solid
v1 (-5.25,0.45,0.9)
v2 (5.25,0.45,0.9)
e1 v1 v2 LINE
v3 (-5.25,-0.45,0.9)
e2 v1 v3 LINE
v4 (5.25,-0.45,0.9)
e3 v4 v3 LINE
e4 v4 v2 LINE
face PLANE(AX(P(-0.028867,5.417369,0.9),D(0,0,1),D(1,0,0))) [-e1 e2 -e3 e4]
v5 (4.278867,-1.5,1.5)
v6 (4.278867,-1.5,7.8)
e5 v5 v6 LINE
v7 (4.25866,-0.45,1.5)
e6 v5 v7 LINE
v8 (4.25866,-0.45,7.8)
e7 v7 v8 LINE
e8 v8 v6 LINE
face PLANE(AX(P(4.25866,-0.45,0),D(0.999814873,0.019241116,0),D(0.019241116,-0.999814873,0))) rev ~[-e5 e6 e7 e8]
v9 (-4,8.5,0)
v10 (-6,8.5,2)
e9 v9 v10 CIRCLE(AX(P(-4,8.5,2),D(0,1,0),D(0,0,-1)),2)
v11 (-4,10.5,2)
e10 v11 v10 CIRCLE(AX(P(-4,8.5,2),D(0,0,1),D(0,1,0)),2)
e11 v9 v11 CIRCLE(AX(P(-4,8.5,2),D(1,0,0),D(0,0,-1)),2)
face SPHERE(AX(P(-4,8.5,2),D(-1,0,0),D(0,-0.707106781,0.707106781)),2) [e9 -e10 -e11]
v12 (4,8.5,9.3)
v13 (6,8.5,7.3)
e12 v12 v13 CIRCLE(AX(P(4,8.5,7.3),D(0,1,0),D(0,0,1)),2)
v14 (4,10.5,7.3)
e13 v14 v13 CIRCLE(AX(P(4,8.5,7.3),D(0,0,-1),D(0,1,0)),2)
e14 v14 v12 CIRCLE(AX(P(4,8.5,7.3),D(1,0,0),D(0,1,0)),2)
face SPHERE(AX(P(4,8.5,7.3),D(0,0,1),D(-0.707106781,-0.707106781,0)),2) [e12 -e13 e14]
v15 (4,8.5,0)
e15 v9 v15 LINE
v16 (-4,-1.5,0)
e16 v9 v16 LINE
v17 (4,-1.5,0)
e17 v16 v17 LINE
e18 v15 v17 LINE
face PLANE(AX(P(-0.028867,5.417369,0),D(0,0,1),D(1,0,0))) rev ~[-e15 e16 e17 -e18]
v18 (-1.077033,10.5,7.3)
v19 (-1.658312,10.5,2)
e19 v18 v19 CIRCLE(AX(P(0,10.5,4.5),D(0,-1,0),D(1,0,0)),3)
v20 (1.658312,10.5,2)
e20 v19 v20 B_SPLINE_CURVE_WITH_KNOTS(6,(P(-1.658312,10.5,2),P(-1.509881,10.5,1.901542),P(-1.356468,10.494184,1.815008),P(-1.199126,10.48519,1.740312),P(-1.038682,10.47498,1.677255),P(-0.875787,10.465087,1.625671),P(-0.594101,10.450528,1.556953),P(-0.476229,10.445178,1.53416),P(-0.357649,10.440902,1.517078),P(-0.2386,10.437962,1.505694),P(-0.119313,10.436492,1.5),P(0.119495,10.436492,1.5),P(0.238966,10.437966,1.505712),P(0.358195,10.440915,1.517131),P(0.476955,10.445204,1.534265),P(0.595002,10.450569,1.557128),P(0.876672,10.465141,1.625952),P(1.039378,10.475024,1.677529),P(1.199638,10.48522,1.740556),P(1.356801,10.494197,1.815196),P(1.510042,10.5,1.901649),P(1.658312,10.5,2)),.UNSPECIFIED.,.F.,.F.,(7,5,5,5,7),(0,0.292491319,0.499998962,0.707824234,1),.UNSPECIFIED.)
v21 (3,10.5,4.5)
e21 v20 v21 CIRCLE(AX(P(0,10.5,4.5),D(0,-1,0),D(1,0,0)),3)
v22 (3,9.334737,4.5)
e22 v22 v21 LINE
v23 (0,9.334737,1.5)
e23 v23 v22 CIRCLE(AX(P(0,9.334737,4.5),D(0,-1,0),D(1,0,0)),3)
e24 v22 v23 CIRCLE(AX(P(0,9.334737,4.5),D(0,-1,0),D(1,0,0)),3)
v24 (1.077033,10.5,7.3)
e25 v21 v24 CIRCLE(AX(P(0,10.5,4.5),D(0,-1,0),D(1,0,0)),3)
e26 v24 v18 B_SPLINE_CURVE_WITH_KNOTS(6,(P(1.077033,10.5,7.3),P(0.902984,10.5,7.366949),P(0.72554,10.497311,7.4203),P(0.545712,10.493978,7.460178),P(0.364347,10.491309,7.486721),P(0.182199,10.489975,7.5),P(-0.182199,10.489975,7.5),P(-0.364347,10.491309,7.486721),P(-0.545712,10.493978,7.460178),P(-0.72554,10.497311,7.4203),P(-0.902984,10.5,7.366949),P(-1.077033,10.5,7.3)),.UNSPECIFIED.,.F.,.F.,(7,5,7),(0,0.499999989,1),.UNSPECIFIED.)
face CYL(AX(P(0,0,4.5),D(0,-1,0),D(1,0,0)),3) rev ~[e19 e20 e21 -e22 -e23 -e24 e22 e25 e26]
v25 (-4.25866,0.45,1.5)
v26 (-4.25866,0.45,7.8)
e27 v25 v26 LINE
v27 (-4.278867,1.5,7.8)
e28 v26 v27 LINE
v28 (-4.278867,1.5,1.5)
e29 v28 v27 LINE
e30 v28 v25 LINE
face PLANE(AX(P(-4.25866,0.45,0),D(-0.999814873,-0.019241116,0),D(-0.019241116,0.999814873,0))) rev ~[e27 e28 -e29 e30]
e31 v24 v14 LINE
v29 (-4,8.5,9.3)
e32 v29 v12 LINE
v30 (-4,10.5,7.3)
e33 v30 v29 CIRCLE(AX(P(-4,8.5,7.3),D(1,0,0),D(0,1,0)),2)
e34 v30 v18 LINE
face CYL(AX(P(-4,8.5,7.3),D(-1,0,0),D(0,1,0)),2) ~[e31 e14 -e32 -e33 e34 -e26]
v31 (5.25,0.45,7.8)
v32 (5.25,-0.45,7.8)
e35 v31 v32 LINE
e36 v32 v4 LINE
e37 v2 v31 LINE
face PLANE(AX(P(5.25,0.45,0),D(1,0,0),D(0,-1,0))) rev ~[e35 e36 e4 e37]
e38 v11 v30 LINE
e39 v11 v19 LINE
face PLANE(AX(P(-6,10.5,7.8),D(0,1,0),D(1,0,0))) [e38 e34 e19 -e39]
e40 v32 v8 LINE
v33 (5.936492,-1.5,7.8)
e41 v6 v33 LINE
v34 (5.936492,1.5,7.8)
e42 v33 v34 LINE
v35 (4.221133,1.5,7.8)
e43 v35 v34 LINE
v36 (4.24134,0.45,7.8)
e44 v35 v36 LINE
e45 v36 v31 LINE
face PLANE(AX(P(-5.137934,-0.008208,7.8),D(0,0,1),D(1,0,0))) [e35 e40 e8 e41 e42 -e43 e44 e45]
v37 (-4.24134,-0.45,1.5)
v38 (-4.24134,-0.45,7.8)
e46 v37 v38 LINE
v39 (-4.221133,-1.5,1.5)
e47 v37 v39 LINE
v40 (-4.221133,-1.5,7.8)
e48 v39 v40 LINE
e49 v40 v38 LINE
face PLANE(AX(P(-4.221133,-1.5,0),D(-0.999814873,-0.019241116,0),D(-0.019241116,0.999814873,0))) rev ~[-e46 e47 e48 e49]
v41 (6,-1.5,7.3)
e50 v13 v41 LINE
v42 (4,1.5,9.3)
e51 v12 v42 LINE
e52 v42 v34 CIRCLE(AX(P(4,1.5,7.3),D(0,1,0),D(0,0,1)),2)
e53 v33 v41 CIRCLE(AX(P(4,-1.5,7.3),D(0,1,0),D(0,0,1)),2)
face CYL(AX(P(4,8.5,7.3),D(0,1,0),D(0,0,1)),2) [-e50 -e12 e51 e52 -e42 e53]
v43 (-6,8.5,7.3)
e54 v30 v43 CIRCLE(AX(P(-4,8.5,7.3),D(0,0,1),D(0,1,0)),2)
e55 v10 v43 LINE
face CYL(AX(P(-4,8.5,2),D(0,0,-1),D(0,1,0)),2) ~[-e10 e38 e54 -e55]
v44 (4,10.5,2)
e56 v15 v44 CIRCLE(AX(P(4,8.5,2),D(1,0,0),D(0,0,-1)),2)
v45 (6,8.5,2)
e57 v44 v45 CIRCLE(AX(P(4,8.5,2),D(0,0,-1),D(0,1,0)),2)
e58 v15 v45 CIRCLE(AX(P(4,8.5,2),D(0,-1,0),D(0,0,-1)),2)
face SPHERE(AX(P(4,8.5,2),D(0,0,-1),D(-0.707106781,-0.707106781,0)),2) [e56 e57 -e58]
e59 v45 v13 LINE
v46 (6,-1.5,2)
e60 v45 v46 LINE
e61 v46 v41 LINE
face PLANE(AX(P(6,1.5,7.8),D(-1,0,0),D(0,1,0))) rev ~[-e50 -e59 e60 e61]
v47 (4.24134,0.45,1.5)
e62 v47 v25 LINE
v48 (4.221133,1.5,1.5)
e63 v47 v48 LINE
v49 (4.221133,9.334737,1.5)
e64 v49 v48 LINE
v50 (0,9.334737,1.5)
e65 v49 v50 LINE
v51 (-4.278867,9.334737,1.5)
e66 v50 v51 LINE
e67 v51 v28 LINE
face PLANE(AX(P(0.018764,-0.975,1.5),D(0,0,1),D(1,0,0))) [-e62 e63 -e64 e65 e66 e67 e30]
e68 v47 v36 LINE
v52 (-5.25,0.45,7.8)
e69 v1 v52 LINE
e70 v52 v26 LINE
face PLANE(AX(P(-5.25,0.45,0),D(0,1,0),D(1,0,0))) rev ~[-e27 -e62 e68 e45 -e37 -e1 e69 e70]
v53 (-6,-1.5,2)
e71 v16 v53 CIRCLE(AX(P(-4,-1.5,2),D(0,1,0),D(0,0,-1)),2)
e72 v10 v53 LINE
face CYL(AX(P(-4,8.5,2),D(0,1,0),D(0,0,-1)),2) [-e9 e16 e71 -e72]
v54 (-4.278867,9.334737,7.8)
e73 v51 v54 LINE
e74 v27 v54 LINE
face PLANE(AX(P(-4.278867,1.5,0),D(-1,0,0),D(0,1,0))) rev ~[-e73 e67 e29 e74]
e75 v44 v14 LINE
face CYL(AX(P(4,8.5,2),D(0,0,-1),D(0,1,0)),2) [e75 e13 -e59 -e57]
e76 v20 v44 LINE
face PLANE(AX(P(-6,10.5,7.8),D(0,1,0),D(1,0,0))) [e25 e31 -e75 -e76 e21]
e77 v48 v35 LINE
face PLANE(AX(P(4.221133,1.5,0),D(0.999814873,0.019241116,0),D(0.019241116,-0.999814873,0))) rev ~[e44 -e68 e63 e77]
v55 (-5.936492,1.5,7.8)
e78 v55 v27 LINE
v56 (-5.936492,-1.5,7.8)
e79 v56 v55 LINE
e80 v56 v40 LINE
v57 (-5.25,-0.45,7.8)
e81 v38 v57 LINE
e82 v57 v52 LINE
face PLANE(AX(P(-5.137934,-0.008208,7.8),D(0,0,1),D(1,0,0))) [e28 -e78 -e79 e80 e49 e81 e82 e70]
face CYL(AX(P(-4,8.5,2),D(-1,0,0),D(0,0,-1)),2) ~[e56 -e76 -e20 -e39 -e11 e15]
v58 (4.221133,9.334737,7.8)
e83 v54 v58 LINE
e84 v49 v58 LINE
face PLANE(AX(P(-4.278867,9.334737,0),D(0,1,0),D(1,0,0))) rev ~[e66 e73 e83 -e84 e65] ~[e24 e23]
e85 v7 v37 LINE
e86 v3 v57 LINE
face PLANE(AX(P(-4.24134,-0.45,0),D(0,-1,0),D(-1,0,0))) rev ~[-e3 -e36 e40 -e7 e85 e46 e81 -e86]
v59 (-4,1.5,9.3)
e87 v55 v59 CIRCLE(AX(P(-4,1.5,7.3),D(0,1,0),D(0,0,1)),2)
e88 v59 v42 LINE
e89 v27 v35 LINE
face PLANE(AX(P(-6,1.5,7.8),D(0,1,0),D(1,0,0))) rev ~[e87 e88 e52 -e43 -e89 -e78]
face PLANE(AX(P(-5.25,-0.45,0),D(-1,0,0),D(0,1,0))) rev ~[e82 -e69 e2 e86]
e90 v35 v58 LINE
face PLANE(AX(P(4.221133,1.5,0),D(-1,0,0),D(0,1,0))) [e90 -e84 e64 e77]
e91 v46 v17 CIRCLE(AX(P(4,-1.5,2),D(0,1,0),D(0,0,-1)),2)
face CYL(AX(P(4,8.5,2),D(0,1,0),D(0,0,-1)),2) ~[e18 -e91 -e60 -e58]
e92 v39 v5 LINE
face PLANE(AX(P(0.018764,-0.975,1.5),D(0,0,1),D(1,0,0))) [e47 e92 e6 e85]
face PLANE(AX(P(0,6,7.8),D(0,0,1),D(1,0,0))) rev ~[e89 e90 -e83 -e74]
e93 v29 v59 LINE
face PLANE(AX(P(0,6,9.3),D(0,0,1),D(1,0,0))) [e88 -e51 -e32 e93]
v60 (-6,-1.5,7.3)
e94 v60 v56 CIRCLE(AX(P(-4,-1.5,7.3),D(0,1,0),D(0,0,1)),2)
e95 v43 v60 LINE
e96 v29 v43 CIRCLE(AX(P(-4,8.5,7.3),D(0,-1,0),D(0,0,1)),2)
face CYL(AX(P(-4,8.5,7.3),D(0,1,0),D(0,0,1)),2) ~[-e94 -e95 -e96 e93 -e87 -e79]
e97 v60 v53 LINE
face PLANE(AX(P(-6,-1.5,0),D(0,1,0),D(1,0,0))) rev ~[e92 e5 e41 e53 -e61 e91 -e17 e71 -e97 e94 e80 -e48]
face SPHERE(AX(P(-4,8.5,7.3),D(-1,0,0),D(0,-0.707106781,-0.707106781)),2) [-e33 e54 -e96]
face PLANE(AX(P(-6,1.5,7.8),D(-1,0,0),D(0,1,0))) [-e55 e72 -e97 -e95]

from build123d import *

# Parameters (mm, degrees)
F0_W         = 8.5
F0_H         = 7.834737435
F0_W_2       = 1.7211329822
F0_H_2       = 1.165262565
F0_W_3       = 1.7788670178
F1_DEPTH     = 0.9
F2_DEPTH     = 1.5
F3_DEPTH     = 7.8
F5_W         = 12
F5_H         = 9
F6_DEPTH     = 1.5
F7_R         = 3
F8_DEPTH     = 10.501
F9_T1_DEPTH  = 5.3
F9_T3_DEPTH  = 8
F9_T5_DEPTH  = 12
F9_T7_DEPTH  = 15
F9_S11_W     = 2
F9_S11_H     = 2
F9_T12_DEPTH = 2
F9_S17_W     = 2
F9_S17_H     = 2
F9_T18_DEPTH = 2
F9_S23_W     = 2
F9_S23_H     = 2
F9_T24_DEPTH = 2
F9_S29_W     = 2
F9_S29_H     = 2
F9_T30_DEPTH = 2


# Not quite as in the source:
# - a fillet or chamfer that OpenCascade refuses, or shapes differently, is made with other operations: its cross-section is extruded or revolved along the edge and cut away or added
# - a feature names something its author has since deleted; it is built from what else it names


with BuildPart() as f1:
    # F0 (on Top) → F1 (new body)
    with BuildSketch(Plane.XY):
        with Locations((-0.0288670178, 5.4173687175)):
            Rectangle(F0_W, F0_H)
        Polygon((-6, 1.5), (-6, -1.5), (-4.2211329822, -1.5), (-4.2413398946, -0.45), (-5.25, -0.45), (-5.25, 0.45), (-4.2586601054, 0.45), (-4.2788670178, 1.5), align=None)
        Polygon((4.2211329822, 1.5), (-4.2788670178, 1.5), (-4.2586601054, 0.45), (4.2413398946, 0.45), align=None)
        with Locations((-5.1394335089, 5.4173687175)):
            Rectangle(F0_W_2, F0_H)
        Polygon((4.2586601054, -0.45), (4.2788670178, -1.5), (6, -1.5), (6, 1.5), (4.2211329822, 1.5), (4.2413398946, 0.45), (5.25, 0.45), (5.25, -0.45), align=None)
        Polygon((-4.2413398946, -0.45), (-4.2211329822, -1.5), (4.2788670178, -1.5), (4.2586601054, -0.45), align=None)
        Polygon((-4.2586601054, 0.45), (-4.2413398946, -0.45), (4.2586601054, -0.45), (4.2413398946, 0.45), align=None)
        Polygon((-5.25, -0.45), (-4.2413398946, -0.45), (-4.2586601054, 0.45), (-5.25, 0.45), align=None)
        Polygon((4.2413398946, 0.45), (4.2586601054, -0.45), (5.25, -0.45), (5.25, 0.45), align=None)
        with Locations((-5.1394335089, 9.9173687175)):
            Rectangle(F0_W_2, F0_H_2)
        with Locations((-0.0288670178, 9.9173687175)):
            Rectangle(F0_W, F0_H_2)
        with Locations((5.1105664911, 9.9173687175)):
            Rectangle(F0_W_3, F0_H_2)
        with Locations((5.1105664911, 5.4173687175)):
            Rectangle(F0_W_3, F0_H)
    extrude(amount=F1_DEPTH)

    # F0 (on Top) → F2 (join)
    with BuildSketch(Plane.XY):
        Polygon((-4.2413398946, -0.45), (-4.2211329822, -1.5), (4.2788670178, -1.5), (4.2586601054, -0.45), align=None)
        Polygon((-6, 1.5), (-6, -1.5), (-4.2211329822, -1.5), (-4.2413398946, -0.45), (-5.25, -0.45), (-5.25, 0.45), (-4.2586601054, 0.45), (-4.2788670178, 1.5), align=None)
        Polygon((4.2586601054, -0.45), (4.2788670178, -1.5), (6, -1.5), (6, 1.5), (4.2211329822, 1.5), (4.2413398946, 0.45), (5.25, 0.45), (5.25, -0.45), align=None)
        Polygon((4.2211329822, 1.5), (-4.2788670178, 1.5), (-4.2586601054, 0.45), (4.2413398946, 0.45), align=None)
        with Locations((-5.1394335089, 5.4173687175)):
            Rectangle(F0_W_2, F0_H)
        with Locations((5.1105664911, 5.4173687175)):
            Rectangle(F0_W_3, F0_H)
        with Locations((-0.0288670178, 5.4173687175)):
            Rectangle(F0_W, F0_H)
        with Locations((-5.1394335089, 9.9173687175)):
            Rectangle(F0_W_2, F0_H_2)
        with Locations((-0.0288670178, 9.9173687175)):
            Rectangle(F0_W, F0_H_2)
        with Locations((5.1105664911, 9.9173687175)):
            Rectangle(F0_W_3, F0_H_2)
    extrude(amount=F2_DEPTH)

    # F0 (on Top) → F3 (join)
    with BuildSketch(Plane.XY):
        Polygon((-6, 1.5), (-6, -1.5), (-4.2211329822, -1.5), (-4.2413398946, -0.45), (-5.25, -0.45), (-5.25, 0.45), (-4.2586601054, 0.45), (-4.2788670178, 1.5), align=None)
        Polygon((4.2586601054, -0.45), (4.2788670178, -1.5), (6, -1.5), (6, 1.5), (4.2211329822, 1.5), (4.2413398946, 0.45), (5.25, 0.45), (5.25, -0.45), align=None)
        with Locations((-5.1394335089, 5.4173687175)):
            Rectangle(F0_W_2, F0_H)
        with Locations((5.1105664911, 5.4173687175)):
            Rectangle(F0_W_3, F0_H)
        with Locations((-5.1394335089, 9.9173687175)):
            Rectangle(F0_W_2, F0_H_2)
        with Locations((-0.0288670178, 9.9173687175)):
            Rectangle(F0_W, F0_H_2)
        with Locations((5.1105664911, 9.9173687175)):
            Rectangle(F0_W_3, F0_H_2)
    extrude(amount=F3_DEPTH)

    # F5 (on offset) → F6 (join)
    with BuildSketch(Plane.XY.offset(7.8)):
        with Locations((0, 6)):
            Rectangle(F5_W, F5_H)
    extrude(amount=F6_DEPTH)

    # F7 (on Front) → F8 (cut, through all)
    with BuildSketch(Plane.XZ):
        with Locations((0, 4.5)):
            Circle(F7_R)
    extrude(amount=-F8_DEPTH, mode=Mode.SUBTRACT)

    # F9: fillet of radius 2 on 8 edges, made by hand

    # F9_s2 → F9_t1 (cut)
    with BuildSketch(Plane.XY.offset(2)):
        with BuildLine():
            ThreePointArc((4, 10.5), (5.4142135624, 9.9142135624), (6, 8.5))
            Line((6, 8.5), (6, 10.5))
            Line((6, 10.5), (4, 10.5))
        make_face()
        with BuildLine():
            ThreePointArc((-4, 10.5), (-5.4142135624, 9.9142135624), (-6, 8.5))
            Line((-6, 8.5), (-6, 10.5))
            Line((-6, 10.5), (-4, 10.5))
        make_face()
    extrude(amount=F9_T1_DEPTH, mode=Mode.SUBTRACT)

    # F9_s4 → F9_t3 (cut)
    with BuildSketch(Plane.YZ.offset(-4)):
        with BuildLine():
            ThreePointArc((10.5, 7.3), (9.9142135624, 8.7142135624), (8.5, 9.3))
            Line((8.5, 9.3), (10.5, 9.3))
            Line((10.5, 9.3), (10.5, 7.3))
        make_face()
        with BuildLine():
            ThreePointArc((8.5, 0), (9.9142135624, 0.5857864376), (10.5, 2))
            Line((10.5, 2), (10.5, 0))
            Line((10.5, 0), (8.5, 0))
        make_face()
    extrude(amount=F9_T3_DEPTH, mode=Mode.SUBTRACT)

    # F9_s6 → F9_t5 (cut)
    with BuildSketch(Plane.XZ.offset(-8.5)):
        with BuildLine():
            ThreePointArc((4, 9.3), (5.4142135624, 8.7142135624), (6, 7.3))
            Line((6, 7.3), (6, 9.3))
            Line((6, 9.3), (4, 9.3))
        make_face()
        with BuildLine():
            ThreePointArc((-4, 9.3), (-5.4142135624, 8.7142135624), (-6, 7.3))
            Line((-6, 7.3), (-6, 9.3))
            Line((-6, 9.3), (-4, 9.3))
        make_face()
    extrude(amount=F9_T5_DEPTH, mode=Mode.SUBTRACT)

    # F9_s8 → F9_t7 (cut)
    with BuildSketch(Plane.XZ.offset(-8.5)):
        with BuildLine():
            ThreePointArc((4, 0), (5.4142135624, 0.5857864376), (6, 2))
            Line((6, 2), (6, 0))
            Line((6, 0), (4, 0))
        make_face()
        with BuildLine():
            ThreePointArc((-4, 0), (-5.4142135624, 0.5857864376), (-6, 2))
            Line((-6, 2), (-6, 0))
            Line((-6, 0), (-4, 0))
        make_face()
    extrude(amount=F9_T7_DEPTH, mode=Mode.SUBTRACT)


with BuildPart() as f9_tool10:
    # F9_s11 → F9_t12 (new body)
    with BuildSketch(Plane.XY.offset(2)):
        with Locations((5, 9.5)):
            Rectangle(F9_S11_W, F9_S11_H)
    extrude(amount=-F9_T12_DEPTH)

    # F9_s13 → F9_t14 (revolve, cut)
    with BuildSketch(Plane(origin=(4, 8.5, 2), x_dir=(-0.7071067812, -0.7071067812, 0), z_dir=(0.7071067812, -0.7071067812, 0))):
        with BuildLine():
            ThreePointArc((0, -2), (2, 0), (0, 2))
            Line((0, 2), (0, -2))
        make_face()
    revolve(axis=Axis((4, 8.5, 2), (0, 0, -1)), mode=Mode.SUBTRACT)


with BuildPart() as f1_1:
    add(f1.part)

    # F9_t9: cut F9_tool10
    add(f9_tool10.part, mode=Mode.SUBTRACT)


with BuildPart() as f9_tool16:
    # F9_s17 → F9_t18 (new body)
    with BuildSketch(Plane.XY.offset(7.3)):
        with Locations((5, 9.5)):
            Rectangle(F9_S17_W, F9_S17_H)
    extrude(amount=F9_T18_DEPTH)

    # F9_s19 → F9_t20 (revolve, cut)
    with BuildSketch(Plane(origin=(4, 8.5, 7.3), x_dir=(-0.7071067812, -0.7071067812, 0), z_dir=(-0.7071067812, 0.7071067812, 0))):
        with BuildLine():
            ThreePointArc((0, -2), (2, 0), (0, 2))
            Line((0, 2), (0, -2))
        make_face()
    revolve(axis=Axis((4, 8.5, 7.3), (0, 0, 1)), mode=Mode.SUBTRACT)


with BuildPart() as f1_2:
    add(f1_1.part)

    # F9_t15: cut F9_tool16
    add(f9_tool16.part, mode=Mode.SUBTRACT)


with BuildPart() as f9_tool22:
    # F9_s23 → F9_t24 (new body)
    with BuildSketch(Plane.YZ.offset(-4)):
        with Locations((9.5, 8.3)):
            Rectangle(F9_S23_W, F9_S23_H)
    extrude(amount=-F9_T24_DEPTH)

    # F9_s25 → F9_t26 (revolve, cut)
    with BuildSketch(Plane(origin=(-4, 8.5, 7.3), x_dir=(0, -0.7071067812, -0.7071067812), z_dir=(0, 0.7071067812, -0.7071067812))):
        with BuildLine():
            ThreePointArc((0, -2), (2, 0), (0, 2))
            Line((0, 2), (0, -2))
        make_face()
    revolve(axis=Axis((-4, 8.5, 7.3), (-1, 0, 0)), mode=Mode.SUBTRACT)


with BuildPart() as f1_3:
    add(f1_2.part)

    # F9_t21: cut F9_tool22
    add(f9_tool22.part, mode=Mode.SUBTRACT)


with BuildPart() as f9_tool28:
    # F9_s29 → F9_t30 (new body)
    with BuildSketch(Plane.YZ.offset(-4)):
        with Locations((9.5, 1)):
            Rectangle(F9_S29_W, F9_S29_H)
    extrude(amount=-F9_T30_DEPTH)

    # F9_s31 → F9_t32 (revolve, cut)
    with BuildSketch(Plane(origin=(-4, 8.5, 2), x_dir=(0, -0.7071067812, 0.7071067812), z_dir=(0, -0.7071067812, -0.7071067812))):
        with BuildLine():
            ThreePointArc((0, -2), (2, 0), (0, 2))
            Line((0, 2), (0, -2))
        make_face()
    revolve(axis=Axis((-4, 8.5, 2), (-1, 0, 0)), mode=Mode.SUBTRACT)


with BuildPart() as f1_4:
    add(f1_3.part)

    # F9_t27: cut F9_tool28
    add(f9_tool28.part, mode=Mode.SUBTRACT)


solid = f1_4.part
